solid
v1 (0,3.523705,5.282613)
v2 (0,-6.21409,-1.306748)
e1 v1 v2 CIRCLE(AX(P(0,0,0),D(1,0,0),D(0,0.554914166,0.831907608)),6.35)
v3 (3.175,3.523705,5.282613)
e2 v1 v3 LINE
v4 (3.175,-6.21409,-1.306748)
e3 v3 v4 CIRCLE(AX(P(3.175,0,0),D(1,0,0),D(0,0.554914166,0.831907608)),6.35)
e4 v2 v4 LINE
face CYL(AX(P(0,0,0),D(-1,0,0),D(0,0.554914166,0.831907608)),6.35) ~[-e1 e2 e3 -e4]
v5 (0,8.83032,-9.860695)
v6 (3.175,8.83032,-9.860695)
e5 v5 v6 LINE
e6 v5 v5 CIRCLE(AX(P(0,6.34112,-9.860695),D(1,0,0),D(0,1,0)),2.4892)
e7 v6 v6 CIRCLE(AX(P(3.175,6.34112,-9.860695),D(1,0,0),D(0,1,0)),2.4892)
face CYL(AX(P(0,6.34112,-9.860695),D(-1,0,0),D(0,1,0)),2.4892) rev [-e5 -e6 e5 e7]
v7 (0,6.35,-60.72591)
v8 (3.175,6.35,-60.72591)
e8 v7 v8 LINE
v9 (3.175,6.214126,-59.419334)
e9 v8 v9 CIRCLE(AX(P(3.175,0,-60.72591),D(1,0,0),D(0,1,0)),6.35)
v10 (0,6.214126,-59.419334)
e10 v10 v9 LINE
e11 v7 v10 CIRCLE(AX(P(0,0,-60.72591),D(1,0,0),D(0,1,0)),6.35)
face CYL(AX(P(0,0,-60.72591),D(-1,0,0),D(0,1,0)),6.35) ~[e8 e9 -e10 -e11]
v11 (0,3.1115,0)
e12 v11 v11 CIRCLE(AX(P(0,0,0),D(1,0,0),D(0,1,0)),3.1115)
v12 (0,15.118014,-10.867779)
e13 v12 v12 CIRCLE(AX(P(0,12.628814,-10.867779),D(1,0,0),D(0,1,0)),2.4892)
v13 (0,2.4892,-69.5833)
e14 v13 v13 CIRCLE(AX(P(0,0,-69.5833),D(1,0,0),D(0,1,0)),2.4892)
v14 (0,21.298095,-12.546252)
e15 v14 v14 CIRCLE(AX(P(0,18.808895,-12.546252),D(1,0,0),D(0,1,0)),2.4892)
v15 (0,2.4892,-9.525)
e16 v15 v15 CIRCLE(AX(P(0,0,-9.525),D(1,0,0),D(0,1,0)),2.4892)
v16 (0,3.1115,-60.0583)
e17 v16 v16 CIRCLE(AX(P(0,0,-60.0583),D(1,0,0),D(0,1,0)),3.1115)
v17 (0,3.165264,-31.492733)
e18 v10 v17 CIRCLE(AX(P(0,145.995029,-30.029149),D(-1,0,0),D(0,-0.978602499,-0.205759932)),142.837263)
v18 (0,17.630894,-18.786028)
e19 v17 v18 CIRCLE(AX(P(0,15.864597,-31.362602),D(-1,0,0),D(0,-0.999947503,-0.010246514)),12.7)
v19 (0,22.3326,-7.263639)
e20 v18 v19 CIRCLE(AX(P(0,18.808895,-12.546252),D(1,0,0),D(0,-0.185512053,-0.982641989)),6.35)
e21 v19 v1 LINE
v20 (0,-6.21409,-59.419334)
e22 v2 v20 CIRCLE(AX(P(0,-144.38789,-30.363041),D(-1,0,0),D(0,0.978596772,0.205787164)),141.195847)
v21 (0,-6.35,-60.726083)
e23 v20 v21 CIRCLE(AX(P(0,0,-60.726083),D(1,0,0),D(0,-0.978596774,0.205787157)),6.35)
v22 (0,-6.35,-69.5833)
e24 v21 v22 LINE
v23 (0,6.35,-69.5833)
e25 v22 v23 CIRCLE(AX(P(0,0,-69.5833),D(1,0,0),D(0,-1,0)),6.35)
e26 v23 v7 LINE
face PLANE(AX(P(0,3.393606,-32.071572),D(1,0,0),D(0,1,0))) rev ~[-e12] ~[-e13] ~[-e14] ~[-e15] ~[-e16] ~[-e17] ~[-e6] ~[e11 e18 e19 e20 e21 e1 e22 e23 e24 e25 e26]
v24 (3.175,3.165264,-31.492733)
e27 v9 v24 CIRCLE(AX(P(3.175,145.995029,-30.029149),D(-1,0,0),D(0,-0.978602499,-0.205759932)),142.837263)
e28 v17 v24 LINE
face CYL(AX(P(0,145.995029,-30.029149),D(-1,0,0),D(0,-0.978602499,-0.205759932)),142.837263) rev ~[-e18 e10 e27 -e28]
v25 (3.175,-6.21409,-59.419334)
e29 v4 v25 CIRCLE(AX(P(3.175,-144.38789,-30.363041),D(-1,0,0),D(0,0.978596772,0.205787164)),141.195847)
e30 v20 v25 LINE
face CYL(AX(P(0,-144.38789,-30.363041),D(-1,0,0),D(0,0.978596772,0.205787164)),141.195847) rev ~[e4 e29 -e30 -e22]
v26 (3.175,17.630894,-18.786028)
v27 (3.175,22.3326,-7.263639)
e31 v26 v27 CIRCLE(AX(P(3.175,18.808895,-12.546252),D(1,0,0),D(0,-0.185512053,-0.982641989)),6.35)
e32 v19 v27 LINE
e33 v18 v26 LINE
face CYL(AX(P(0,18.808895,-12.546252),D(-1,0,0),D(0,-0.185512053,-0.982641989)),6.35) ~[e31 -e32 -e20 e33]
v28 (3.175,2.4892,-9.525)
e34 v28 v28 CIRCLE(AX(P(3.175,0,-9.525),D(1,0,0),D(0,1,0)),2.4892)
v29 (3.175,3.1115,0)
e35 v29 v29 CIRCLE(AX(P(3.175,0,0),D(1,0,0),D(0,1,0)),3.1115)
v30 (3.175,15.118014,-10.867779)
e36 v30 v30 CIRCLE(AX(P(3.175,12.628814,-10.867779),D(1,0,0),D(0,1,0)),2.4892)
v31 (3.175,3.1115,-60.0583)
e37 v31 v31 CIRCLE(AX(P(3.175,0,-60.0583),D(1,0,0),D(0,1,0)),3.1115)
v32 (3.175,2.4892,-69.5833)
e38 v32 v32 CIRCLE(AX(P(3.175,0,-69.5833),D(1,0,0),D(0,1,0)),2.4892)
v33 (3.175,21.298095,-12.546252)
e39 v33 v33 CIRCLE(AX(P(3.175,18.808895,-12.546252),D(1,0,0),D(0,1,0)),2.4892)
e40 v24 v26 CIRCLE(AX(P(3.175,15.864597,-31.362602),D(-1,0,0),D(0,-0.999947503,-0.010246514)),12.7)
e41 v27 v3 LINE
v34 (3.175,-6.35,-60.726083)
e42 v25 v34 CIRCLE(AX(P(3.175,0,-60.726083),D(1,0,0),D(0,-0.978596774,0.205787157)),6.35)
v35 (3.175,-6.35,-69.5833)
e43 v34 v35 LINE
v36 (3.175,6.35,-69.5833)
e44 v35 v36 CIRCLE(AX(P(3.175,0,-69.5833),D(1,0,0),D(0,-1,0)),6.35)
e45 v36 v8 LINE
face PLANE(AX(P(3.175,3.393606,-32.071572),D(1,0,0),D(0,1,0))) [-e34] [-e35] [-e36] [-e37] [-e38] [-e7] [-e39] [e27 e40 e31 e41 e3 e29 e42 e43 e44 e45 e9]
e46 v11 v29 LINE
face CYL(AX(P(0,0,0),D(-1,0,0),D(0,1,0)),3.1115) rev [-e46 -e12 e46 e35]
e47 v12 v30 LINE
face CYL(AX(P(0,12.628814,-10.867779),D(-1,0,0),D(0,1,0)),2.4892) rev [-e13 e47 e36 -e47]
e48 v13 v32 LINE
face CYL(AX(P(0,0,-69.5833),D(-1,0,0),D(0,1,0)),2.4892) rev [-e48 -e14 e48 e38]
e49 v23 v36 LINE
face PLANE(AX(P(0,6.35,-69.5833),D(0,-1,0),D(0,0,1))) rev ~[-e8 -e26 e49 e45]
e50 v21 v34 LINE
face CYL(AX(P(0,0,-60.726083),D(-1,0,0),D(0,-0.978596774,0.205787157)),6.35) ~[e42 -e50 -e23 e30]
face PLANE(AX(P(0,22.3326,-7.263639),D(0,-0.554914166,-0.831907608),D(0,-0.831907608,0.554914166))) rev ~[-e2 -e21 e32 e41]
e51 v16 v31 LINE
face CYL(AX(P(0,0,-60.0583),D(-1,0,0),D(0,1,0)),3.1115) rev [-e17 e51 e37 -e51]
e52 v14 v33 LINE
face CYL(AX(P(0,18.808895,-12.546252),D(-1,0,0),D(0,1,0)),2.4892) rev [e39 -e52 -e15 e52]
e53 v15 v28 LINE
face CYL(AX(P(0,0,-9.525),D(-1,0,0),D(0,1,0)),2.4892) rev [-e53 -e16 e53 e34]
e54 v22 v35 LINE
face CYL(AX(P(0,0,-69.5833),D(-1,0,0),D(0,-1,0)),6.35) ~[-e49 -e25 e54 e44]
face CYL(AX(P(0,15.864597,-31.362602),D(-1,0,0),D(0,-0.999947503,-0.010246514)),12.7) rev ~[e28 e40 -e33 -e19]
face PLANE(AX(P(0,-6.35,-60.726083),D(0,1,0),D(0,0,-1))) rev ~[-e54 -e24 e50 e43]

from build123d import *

# Parameters (mm, degrees)
F0_R     = 2.4892
F0_R_2   = 3.1115
F1_DEPTH = 3.175


# Not quite as in the source:
# - ends of sketch curves that miss each other by under 0.0002 mm in the source are joined


with BuildPart() as f1:
    # F0 (on Right) → F1 (new body)
    with BuildSketch(Plane.YZ):
        with BuildLine():
            Line((22.3326001159, -7.2636385381), (3.5237049527, 5.2826133121))
            ThreePointArc((3.5237049527, 5.2826133121), (-3.5587166415, 5.2590907831), (-6.2140895311, -1.3067483686))
            ThreePointArc((-6.2140895311, -1.3067483686), (-3.1920426976, -30.3630411987), (-6.2140895148, -59.419334071))
            ThreePointArc((-6.2140895148, -59.419334071), (-6.3159309852, -60.0691839024), (-6.35, -60.7260825175))
            Line((-6.35, -60.7260825175), (-6.35, -69.5833))
            ThreePointArc((-6.35, -69.5833), (0, -75.9333), (6.35, -69.5833))
            Line((6.35, -69.5833), (6.35, -60.7259096378))
            ThreePointArc((6.35, -60.7259096378), (6.3159401222, -60.069098879), (6.2141258668, -59.419334071))
            ThreePointArc((6.2141258668, -59.419334071), (4.0014684949, -45.5311698082), (3.1652638563, -31.4927325362))
            ThreePointArc((3.1652638563, -31.4927325362), (7.4831947902, -21.8210036968), (17.6308936292, -18.7860284798))
            ThreePointArc((17.6308936292, -18.7860284798), (24.6882615086, -14.9453248745), (22.3326001159, -7.2636385381))
        make_face()
        with Locations((0, -69.5833)):
            Circle(F0_R, mode=Mode.SUBTRACT)
        with Locations((0, -60.0583)):
            Circle(F0_R_2, mode=Mode.SUBTRACT)
        with Locations((0, -9.525)):
            Circle(F0_R, mode=Mode.SUBTRACT)
        Circle(F0_R_2, mode=Mode.SUBTRACT)
        with Locations((6.3411204926, -9.86069465)):
            Circle(F0_R, mode=Mode.SUBTRACT)
        with Locations((12.6288141023, -10.8677786001)):
            Circle(F0_R, mode=Mode.SUBTRACT)
        with Locations((18.8088951631, -12.5462518503)):
            Circle(F0_R, mode=Mode.SUBTRACT)
    extrude(amount=F1_DEPTH)


solid = f1.part
